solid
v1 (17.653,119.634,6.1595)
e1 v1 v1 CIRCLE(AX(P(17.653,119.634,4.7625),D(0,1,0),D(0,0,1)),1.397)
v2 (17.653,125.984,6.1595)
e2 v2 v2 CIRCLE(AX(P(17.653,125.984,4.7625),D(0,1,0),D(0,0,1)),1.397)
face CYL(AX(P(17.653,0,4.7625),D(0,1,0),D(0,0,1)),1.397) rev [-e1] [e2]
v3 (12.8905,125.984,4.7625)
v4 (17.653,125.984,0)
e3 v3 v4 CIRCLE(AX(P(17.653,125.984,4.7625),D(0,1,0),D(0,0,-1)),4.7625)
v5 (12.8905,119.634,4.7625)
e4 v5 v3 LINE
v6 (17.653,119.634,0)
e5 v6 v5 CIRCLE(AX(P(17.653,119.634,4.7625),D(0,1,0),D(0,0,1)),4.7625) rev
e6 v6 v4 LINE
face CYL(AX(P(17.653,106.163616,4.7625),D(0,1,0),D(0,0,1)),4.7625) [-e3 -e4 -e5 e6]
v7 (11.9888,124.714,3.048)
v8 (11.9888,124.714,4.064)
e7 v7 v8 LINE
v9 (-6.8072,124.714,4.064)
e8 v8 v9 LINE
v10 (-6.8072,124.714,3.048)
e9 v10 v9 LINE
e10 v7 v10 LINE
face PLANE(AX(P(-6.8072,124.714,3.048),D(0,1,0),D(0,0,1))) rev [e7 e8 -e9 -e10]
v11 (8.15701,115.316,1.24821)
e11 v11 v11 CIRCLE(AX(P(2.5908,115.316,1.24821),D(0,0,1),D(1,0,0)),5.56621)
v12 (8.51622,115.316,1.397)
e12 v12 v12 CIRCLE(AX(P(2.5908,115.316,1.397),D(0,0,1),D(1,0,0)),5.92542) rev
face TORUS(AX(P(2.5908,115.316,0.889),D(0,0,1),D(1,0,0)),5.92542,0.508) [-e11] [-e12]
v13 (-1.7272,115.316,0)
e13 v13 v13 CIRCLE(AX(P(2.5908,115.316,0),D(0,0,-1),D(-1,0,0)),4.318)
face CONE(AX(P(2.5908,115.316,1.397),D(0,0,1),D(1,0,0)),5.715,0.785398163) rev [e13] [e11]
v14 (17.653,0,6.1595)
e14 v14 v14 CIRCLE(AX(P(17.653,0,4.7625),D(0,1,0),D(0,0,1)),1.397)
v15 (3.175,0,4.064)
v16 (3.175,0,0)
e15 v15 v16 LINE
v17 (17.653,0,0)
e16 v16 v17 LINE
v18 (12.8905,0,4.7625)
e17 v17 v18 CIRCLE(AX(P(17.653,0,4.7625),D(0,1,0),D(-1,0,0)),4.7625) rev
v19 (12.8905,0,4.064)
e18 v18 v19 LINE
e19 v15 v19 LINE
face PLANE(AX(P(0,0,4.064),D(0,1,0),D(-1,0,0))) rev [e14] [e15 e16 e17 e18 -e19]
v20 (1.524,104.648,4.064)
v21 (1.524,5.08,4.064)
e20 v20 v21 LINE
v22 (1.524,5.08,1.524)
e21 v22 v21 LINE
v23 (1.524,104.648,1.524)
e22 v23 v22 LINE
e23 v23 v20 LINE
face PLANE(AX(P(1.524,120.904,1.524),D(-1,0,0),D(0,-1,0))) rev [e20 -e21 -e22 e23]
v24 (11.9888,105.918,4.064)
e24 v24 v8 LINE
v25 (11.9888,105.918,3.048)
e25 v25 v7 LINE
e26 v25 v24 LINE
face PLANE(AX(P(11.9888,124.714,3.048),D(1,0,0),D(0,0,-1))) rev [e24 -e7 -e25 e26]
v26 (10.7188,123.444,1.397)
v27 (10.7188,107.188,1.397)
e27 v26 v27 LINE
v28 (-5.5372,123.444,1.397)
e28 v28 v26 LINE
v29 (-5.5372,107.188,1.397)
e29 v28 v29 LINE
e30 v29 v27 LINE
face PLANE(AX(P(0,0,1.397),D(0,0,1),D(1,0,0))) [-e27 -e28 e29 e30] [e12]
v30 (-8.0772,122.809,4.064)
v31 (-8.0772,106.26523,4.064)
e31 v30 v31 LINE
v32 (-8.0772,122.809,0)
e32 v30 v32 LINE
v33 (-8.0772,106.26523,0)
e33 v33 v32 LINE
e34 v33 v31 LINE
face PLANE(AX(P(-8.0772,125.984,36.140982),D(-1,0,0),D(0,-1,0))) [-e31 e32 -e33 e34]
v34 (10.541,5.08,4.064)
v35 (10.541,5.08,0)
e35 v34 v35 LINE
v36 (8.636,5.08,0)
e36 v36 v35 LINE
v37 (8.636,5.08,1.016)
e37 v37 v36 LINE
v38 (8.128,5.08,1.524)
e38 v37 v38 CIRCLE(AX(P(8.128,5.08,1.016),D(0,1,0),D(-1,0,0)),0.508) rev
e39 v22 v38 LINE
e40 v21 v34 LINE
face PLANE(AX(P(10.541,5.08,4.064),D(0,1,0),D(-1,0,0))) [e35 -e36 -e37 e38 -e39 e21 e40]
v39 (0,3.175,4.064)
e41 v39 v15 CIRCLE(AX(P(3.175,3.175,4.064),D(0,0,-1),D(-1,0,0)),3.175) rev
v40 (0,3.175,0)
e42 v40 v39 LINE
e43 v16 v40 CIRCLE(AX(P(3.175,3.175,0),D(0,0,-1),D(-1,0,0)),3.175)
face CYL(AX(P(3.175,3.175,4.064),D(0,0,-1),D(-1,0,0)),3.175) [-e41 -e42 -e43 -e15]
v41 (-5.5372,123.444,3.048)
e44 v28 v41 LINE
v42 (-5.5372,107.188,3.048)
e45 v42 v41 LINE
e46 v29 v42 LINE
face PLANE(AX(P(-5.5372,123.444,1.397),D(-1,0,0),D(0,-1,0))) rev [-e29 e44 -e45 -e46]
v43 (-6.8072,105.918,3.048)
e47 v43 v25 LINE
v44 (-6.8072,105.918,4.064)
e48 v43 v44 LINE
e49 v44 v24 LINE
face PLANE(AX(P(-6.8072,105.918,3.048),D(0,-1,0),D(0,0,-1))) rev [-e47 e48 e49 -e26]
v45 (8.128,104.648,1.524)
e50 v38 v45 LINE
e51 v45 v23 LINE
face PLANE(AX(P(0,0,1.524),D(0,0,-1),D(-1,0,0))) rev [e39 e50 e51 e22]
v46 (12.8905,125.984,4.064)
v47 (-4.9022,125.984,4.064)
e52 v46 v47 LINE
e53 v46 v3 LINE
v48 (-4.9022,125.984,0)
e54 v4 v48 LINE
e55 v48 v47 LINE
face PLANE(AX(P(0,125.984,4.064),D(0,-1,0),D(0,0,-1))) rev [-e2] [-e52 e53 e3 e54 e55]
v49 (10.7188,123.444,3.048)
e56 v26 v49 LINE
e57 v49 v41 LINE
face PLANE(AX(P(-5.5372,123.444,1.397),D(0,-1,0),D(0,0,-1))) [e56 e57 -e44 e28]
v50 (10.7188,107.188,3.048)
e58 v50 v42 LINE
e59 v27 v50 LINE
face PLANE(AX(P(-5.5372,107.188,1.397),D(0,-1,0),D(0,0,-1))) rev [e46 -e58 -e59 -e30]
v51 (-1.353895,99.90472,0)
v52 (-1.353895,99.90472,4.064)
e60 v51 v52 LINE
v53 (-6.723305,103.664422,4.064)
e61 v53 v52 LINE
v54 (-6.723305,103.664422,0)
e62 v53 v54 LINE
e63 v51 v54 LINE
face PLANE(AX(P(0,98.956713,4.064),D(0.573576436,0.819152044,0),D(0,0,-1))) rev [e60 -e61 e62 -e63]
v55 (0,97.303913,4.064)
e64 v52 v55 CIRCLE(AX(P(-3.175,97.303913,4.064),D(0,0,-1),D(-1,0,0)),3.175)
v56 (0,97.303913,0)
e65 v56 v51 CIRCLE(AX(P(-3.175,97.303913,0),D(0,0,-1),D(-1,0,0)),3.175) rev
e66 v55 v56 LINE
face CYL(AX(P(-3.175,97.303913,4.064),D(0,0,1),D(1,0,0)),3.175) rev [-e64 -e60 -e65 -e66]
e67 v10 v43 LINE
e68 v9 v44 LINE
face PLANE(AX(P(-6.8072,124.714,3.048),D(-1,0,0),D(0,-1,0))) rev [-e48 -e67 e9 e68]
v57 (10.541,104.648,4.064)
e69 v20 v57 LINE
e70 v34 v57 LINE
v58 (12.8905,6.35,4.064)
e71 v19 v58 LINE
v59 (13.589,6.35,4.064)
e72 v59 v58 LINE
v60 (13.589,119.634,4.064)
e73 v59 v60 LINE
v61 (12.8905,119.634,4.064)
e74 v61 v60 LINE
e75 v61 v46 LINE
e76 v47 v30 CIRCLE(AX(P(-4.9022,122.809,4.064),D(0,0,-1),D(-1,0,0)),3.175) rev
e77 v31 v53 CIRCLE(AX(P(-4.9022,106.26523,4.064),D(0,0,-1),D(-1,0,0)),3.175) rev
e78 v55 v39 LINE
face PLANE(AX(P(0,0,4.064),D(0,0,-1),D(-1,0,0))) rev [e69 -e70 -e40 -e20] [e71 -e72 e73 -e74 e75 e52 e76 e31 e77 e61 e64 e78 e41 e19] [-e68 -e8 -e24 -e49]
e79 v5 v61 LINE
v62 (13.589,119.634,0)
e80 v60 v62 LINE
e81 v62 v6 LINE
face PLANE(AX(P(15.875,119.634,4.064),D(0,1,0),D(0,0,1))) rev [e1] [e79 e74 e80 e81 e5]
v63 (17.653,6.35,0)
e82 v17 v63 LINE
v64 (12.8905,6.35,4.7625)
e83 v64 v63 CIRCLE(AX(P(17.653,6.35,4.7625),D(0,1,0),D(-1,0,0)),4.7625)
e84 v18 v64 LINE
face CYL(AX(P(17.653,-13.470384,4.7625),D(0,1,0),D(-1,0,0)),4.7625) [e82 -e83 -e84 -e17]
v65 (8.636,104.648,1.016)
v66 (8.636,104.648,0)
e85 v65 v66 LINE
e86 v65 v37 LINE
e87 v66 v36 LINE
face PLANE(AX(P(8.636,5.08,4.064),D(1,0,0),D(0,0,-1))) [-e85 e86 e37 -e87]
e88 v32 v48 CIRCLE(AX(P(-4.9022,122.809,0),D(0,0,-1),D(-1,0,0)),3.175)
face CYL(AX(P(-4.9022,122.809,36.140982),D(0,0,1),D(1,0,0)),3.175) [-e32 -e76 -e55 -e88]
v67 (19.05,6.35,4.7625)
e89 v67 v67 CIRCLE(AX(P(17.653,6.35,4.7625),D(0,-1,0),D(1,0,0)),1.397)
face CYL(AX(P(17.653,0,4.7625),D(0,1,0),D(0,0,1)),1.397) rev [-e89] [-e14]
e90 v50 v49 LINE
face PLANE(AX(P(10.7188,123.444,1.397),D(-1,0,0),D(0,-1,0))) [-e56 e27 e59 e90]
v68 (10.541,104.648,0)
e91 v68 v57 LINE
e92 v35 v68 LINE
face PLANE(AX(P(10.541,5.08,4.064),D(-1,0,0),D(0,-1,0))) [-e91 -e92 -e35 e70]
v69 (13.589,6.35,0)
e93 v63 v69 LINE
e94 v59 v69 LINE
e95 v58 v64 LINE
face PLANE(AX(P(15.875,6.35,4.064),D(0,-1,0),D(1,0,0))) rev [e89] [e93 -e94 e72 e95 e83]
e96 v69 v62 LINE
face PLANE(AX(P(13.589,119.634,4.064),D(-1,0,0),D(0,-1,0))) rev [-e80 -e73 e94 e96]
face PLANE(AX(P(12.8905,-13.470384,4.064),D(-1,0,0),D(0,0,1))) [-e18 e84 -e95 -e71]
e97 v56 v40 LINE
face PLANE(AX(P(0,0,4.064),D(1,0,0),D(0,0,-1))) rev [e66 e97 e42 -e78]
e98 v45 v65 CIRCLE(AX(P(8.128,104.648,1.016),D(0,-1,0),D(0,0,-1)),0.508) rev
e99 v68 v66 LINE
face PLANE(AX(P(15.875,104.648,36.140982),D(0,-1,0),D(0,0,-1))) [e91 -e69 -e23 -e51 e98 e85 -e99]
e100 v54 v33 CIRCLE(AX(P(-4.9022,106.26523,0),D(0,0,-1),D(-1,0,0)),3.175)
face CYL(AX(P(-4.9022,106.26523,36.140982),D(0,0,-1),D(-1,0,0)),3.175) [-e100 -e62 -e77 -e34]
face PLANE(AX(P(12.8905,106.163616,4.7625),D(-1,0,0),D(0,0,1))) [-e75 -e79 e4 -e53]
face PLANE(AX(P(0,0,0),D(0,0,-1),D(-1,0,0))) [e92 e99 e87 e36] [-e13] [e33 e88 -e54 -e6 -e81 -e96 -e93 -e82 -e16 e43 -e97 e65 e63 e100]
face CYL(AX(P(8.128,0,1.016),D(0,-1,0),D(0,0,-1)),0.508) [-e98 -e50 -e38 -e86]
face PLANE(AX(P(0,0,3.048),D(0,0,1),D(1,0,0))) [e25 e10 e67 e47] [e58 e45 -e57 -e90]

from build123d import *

# Parameters (mm, degrees)
SKETCH1_W           = 15.875
SKETCH1_H           = 125.984
SKETCH1_W_2         = 1.905
SKETCH1_H_2         = 115.824
BOSS_EXTRUDE1_DEPTH = 4.064
SKETCH2_W           = 7.112
SKETCH2_H           = 115.824
CUT_EXTRUDE1_DEPTH  = 2.54
FILLET1_R           = 0.508
BOSS_EXTRUDE2_START = -4.064
SKETCH3_W           = 23.9522
SKETCH3_H           = 21.336
BOSS_EXTRUDE2_DEPTH = 4.064
SKETCH4_W           = 16.256
SKETCH4_H           = 16.256
CUT_EXTRUDE2_DEPTH  = 2.667
SKETCH5_W           = 18.796
SKETCH5_H           = 18.796
CUT_EXTRUDE3_DEPTH  = 1.016
SKETCH6_R           = 5.715
CUT_EXTRUDE4_DEPTH  = 2.54
CUT_EXTRUDE4_DRAFT  = -45
CHAMFER1_SIZE       = 8.128
CHAMFER1_SIZE_2     = 5.691286871
FILLET3_R           = 3.175
FILLET4_R           = 0.508
SKETCH7_W           = 2.286
SKETCH7_H           = 113.284
CUT_EXTRUDE5_DEPTH  = 128.045267433
BOSS_EXTRUDE3_DEPTH = 6.35
BOSS_EXTRUDE4_DEPTH = 6.35
SKETCH10_R          = 1.397
CUT_EXTRUDE6_DEPTH  = 129.316594879


with BuildPart() as part:
    # Sketch1 → Boss-Extrude1 (new body)
    with BuildSketch(Plane.XY):
        with Locations((7.9375, 62.992)):
            Rectangle(SKETCH1_W, SKETCH1_H)
        with Locations((9.5885, 62.992)):
            Rectangle(SKETCH1_W_2, SKETCH1_H_2, mode=Mode.SUBTRACT)
    extrude(amount=BOSS_EXTRUDE1_DEPTH)

    # Sketch2 → Cut-Extrude1 (cut)
    with BuildSketch(Plane.XY.offset(4.064)):
        with Locations((5.08, 62.992)):
            Rectangle(SKETCH2_W, SKETCH2_H)
    extrude(amount=-CUT_EXTRUDE1_DEPTH, mode=Mode.SUBTRACT)

    # Fillet1
    fillet1_edges = [part.edges().sort_by_distance(p)[0] for p in [
        (8.636, 62.992, 1.524),
    ]]
    fillet(fillet1_edges, radius=FILLET1_R)

    # Sketch3 → Boss-Extrude2 (add)
    with BuildSketch(Plane(origin=(0, 0, 0), x_dir=(-1, 0, 0), z_dir=(0, 0, -1)).offset(BOSS_EXTRUDE2_START)):
        with Locations((-3.8989, 115.316)):
            Rectangle(SKETCH3_W, SKETCH3_H)
    extrude(amount=BOSS_EXTRUDE2_DEPTH)

    # Sketch4 → Cut-Extrude2 (cut)
    with BuildSketch(Plane.XY.offset(4.064)):
        with Locations((2.5908, 115.316)):
            Rectangle(SKETCH4_W, SKETCH4_H)
    extrude(amount=-CUT_EXTRUDE2_DEPTH, mode=Mode.SUBTRACT)

    # Sketch5 → Cut-Extrude3 (cut)
    with BuildSketch(Plane.XY.offset(4.064)):
        with Locations((2.5908, 115.316)):
            Rectangle(SKETCH5_W, SKETCH5_H)
    extrude(amount=-CUT_EXTRUDE3_DEPTH, mode=Mode.SUBTRACT)


with BuildPart() as cut_extrude4_tool:
    # Sketch6 → Cut-Extrude4 (with draft: the straight prism first)
    with BuildSketch(Plane.XY.offset(1.397)):
        with Locations((2.5908, 115.316)):
            Circle(SKETCH6_R)
    extrude(amount=-CUT_EXTRUDE4_DEPTH)
    # Cut-Extrude4: the draft: its side faces are tilted about the plane it starts from
    cut_extrude4_sides = [cut_extrude4_tool.faces().sort_by_distance(p)[0] for p in [
        (-3.1242, 115.316, 0.127),
    ]]
    draft(cut_extrude4_sides, Plane.XY.offset(1.397), CUT_EXTRUDE4_DRAFT)


with BuildPart() as part_1:
    add(part.part)

    # Cut-Extrude4: cut by cut_extrude4_tool
    add(cut_extrude4_tool.part, mode=Mode.SUBTRACT)

    # Chamfer1
    # the kernel refuses this chamfer: 8.128, 5.691286871 mm, written as the material it adds along each edge
    with BuildSketch(Plane(origin=(0, 104.648, 4.064), x_dir=(-0.9997533347641298, 0.022209674198457242, 0), z_dir=(0, 0, -1))) as chamfer1_piece_1_section:
        Polygon((CHAMFER1_SIZE * 0.999753334764, -CHAMFER1_SIZE * 0.0222096741985), (-CHAMFER1_SIZE_2 * 0.0222096741968, -CHAMFER1_SIZE_2 * 0.999753334688), (0, 0), align=None)
    chamfer1_piece_1 = extrude(amount=4.064, mode=Mode.PRIVATE)
    chamfer1_piece_1 = split(chamfer1_piece_1, bisect_by=Plane(origin=(-8.0772, 102.794358519, 2.032), z_dir=(1, 0, 0)), keep=Keep.TOP, mode=Mode.PRIVATE)
    add(chamfer1_piece_1)

    # Fillet3
    fillet3_edges = [part_1.edges().sort_by_distance(p)[0] for p in [
        (0, 98.956713129, 2.032),
        (-8.0772, 104.612429457, 2.032),
        (-8.0772, 125.984, 2.032),
        (0, 0, 2.032),
    ]]
    fillet(fillet3_edges, radius=FILLET3_R)

    # Fillet4
    fillet4_edges = [part_1.edges().sort_by_distance(p)[0] for p in [
        (-3.1242, 115.316, 1.397),
    ]]
    fillet(fillet4_edges, radius=FILLET4_R)

    # Sketch7 → Cut-Extrude5 (cut, through all)
    with BuildSketch(Plane(origin=(0, 0, 0), x_dir=(-1, 0, 0), z_dir=(0, 0, -1))):
        with Locations((-14.732, 62.992)):
            Rectangle(SKETCH7_W, SKETCH7_H)
    extrude(amount=-CUT_EXTRUDE5_DEPTH, mode=Mode.SUBTRACT)

    # Sketch8 → Boss-Extrude3 (add)
    with BuildSketch(Plane(origin=(0, 125.984, 0), x_dir=(1, 0, 0), z_dir=(0, 1, 0))):
        with BuildLine():
            Line((15.875, 0), (17.653, 0))
            ThreePointArc((17.653, 0), (21.020596045, -8.130096045), (12.8905, -4.7625))
            Line((12.8905, -4.7625), (12.8905, -4.064))
            Line((12.8905, -4.064), (15.875, -4.064))
            Line((15.875, -4.064), (15.875, 0))
        make_face()
    extrude(amount=-BOSS_EXTRUDE3_DEPTH)

    # Sketch9 → Boss-Extrude4 (add)
    with BuildSketch(Plane(origin=(0, 6.35, 0), x_dir=(1, 0, 0), z_dir=(0, 1, 0))):
        with BuildLine():
            Line((17.653, 0), (13.589, 0))
            Line((13.589, 0), (13.589, -4.064))
            Line((13.589, -4.064), (12.8905, -4.064))
            Line((12.8905, -4.064), (12.8905, -4.7625))
            ThreePointArc((12.8905, -4.7625), (21.020596045, -8.130096045), (17.653, 0))
        make_face()
    extrude(amount=-BOSS_EXTRUDE4_DEPTH)

    # Sketch10 → Cut-Extrude6 (cut, through all)
    with BuildSketch(Plane(origin=(0, 125.984, 0), x_dir=(1, 0, 0), z_dir=(0, 1, 0))):
        with Locations(Location((17.653, -4.7625, 0), (0, 0, 270))):
            Circle(SKETCH10_R)
    extrude(amount=-CUT_EXTRUDE6_DEPTH, mode=Mode.SUBTRACT)


solid = part_1.part
